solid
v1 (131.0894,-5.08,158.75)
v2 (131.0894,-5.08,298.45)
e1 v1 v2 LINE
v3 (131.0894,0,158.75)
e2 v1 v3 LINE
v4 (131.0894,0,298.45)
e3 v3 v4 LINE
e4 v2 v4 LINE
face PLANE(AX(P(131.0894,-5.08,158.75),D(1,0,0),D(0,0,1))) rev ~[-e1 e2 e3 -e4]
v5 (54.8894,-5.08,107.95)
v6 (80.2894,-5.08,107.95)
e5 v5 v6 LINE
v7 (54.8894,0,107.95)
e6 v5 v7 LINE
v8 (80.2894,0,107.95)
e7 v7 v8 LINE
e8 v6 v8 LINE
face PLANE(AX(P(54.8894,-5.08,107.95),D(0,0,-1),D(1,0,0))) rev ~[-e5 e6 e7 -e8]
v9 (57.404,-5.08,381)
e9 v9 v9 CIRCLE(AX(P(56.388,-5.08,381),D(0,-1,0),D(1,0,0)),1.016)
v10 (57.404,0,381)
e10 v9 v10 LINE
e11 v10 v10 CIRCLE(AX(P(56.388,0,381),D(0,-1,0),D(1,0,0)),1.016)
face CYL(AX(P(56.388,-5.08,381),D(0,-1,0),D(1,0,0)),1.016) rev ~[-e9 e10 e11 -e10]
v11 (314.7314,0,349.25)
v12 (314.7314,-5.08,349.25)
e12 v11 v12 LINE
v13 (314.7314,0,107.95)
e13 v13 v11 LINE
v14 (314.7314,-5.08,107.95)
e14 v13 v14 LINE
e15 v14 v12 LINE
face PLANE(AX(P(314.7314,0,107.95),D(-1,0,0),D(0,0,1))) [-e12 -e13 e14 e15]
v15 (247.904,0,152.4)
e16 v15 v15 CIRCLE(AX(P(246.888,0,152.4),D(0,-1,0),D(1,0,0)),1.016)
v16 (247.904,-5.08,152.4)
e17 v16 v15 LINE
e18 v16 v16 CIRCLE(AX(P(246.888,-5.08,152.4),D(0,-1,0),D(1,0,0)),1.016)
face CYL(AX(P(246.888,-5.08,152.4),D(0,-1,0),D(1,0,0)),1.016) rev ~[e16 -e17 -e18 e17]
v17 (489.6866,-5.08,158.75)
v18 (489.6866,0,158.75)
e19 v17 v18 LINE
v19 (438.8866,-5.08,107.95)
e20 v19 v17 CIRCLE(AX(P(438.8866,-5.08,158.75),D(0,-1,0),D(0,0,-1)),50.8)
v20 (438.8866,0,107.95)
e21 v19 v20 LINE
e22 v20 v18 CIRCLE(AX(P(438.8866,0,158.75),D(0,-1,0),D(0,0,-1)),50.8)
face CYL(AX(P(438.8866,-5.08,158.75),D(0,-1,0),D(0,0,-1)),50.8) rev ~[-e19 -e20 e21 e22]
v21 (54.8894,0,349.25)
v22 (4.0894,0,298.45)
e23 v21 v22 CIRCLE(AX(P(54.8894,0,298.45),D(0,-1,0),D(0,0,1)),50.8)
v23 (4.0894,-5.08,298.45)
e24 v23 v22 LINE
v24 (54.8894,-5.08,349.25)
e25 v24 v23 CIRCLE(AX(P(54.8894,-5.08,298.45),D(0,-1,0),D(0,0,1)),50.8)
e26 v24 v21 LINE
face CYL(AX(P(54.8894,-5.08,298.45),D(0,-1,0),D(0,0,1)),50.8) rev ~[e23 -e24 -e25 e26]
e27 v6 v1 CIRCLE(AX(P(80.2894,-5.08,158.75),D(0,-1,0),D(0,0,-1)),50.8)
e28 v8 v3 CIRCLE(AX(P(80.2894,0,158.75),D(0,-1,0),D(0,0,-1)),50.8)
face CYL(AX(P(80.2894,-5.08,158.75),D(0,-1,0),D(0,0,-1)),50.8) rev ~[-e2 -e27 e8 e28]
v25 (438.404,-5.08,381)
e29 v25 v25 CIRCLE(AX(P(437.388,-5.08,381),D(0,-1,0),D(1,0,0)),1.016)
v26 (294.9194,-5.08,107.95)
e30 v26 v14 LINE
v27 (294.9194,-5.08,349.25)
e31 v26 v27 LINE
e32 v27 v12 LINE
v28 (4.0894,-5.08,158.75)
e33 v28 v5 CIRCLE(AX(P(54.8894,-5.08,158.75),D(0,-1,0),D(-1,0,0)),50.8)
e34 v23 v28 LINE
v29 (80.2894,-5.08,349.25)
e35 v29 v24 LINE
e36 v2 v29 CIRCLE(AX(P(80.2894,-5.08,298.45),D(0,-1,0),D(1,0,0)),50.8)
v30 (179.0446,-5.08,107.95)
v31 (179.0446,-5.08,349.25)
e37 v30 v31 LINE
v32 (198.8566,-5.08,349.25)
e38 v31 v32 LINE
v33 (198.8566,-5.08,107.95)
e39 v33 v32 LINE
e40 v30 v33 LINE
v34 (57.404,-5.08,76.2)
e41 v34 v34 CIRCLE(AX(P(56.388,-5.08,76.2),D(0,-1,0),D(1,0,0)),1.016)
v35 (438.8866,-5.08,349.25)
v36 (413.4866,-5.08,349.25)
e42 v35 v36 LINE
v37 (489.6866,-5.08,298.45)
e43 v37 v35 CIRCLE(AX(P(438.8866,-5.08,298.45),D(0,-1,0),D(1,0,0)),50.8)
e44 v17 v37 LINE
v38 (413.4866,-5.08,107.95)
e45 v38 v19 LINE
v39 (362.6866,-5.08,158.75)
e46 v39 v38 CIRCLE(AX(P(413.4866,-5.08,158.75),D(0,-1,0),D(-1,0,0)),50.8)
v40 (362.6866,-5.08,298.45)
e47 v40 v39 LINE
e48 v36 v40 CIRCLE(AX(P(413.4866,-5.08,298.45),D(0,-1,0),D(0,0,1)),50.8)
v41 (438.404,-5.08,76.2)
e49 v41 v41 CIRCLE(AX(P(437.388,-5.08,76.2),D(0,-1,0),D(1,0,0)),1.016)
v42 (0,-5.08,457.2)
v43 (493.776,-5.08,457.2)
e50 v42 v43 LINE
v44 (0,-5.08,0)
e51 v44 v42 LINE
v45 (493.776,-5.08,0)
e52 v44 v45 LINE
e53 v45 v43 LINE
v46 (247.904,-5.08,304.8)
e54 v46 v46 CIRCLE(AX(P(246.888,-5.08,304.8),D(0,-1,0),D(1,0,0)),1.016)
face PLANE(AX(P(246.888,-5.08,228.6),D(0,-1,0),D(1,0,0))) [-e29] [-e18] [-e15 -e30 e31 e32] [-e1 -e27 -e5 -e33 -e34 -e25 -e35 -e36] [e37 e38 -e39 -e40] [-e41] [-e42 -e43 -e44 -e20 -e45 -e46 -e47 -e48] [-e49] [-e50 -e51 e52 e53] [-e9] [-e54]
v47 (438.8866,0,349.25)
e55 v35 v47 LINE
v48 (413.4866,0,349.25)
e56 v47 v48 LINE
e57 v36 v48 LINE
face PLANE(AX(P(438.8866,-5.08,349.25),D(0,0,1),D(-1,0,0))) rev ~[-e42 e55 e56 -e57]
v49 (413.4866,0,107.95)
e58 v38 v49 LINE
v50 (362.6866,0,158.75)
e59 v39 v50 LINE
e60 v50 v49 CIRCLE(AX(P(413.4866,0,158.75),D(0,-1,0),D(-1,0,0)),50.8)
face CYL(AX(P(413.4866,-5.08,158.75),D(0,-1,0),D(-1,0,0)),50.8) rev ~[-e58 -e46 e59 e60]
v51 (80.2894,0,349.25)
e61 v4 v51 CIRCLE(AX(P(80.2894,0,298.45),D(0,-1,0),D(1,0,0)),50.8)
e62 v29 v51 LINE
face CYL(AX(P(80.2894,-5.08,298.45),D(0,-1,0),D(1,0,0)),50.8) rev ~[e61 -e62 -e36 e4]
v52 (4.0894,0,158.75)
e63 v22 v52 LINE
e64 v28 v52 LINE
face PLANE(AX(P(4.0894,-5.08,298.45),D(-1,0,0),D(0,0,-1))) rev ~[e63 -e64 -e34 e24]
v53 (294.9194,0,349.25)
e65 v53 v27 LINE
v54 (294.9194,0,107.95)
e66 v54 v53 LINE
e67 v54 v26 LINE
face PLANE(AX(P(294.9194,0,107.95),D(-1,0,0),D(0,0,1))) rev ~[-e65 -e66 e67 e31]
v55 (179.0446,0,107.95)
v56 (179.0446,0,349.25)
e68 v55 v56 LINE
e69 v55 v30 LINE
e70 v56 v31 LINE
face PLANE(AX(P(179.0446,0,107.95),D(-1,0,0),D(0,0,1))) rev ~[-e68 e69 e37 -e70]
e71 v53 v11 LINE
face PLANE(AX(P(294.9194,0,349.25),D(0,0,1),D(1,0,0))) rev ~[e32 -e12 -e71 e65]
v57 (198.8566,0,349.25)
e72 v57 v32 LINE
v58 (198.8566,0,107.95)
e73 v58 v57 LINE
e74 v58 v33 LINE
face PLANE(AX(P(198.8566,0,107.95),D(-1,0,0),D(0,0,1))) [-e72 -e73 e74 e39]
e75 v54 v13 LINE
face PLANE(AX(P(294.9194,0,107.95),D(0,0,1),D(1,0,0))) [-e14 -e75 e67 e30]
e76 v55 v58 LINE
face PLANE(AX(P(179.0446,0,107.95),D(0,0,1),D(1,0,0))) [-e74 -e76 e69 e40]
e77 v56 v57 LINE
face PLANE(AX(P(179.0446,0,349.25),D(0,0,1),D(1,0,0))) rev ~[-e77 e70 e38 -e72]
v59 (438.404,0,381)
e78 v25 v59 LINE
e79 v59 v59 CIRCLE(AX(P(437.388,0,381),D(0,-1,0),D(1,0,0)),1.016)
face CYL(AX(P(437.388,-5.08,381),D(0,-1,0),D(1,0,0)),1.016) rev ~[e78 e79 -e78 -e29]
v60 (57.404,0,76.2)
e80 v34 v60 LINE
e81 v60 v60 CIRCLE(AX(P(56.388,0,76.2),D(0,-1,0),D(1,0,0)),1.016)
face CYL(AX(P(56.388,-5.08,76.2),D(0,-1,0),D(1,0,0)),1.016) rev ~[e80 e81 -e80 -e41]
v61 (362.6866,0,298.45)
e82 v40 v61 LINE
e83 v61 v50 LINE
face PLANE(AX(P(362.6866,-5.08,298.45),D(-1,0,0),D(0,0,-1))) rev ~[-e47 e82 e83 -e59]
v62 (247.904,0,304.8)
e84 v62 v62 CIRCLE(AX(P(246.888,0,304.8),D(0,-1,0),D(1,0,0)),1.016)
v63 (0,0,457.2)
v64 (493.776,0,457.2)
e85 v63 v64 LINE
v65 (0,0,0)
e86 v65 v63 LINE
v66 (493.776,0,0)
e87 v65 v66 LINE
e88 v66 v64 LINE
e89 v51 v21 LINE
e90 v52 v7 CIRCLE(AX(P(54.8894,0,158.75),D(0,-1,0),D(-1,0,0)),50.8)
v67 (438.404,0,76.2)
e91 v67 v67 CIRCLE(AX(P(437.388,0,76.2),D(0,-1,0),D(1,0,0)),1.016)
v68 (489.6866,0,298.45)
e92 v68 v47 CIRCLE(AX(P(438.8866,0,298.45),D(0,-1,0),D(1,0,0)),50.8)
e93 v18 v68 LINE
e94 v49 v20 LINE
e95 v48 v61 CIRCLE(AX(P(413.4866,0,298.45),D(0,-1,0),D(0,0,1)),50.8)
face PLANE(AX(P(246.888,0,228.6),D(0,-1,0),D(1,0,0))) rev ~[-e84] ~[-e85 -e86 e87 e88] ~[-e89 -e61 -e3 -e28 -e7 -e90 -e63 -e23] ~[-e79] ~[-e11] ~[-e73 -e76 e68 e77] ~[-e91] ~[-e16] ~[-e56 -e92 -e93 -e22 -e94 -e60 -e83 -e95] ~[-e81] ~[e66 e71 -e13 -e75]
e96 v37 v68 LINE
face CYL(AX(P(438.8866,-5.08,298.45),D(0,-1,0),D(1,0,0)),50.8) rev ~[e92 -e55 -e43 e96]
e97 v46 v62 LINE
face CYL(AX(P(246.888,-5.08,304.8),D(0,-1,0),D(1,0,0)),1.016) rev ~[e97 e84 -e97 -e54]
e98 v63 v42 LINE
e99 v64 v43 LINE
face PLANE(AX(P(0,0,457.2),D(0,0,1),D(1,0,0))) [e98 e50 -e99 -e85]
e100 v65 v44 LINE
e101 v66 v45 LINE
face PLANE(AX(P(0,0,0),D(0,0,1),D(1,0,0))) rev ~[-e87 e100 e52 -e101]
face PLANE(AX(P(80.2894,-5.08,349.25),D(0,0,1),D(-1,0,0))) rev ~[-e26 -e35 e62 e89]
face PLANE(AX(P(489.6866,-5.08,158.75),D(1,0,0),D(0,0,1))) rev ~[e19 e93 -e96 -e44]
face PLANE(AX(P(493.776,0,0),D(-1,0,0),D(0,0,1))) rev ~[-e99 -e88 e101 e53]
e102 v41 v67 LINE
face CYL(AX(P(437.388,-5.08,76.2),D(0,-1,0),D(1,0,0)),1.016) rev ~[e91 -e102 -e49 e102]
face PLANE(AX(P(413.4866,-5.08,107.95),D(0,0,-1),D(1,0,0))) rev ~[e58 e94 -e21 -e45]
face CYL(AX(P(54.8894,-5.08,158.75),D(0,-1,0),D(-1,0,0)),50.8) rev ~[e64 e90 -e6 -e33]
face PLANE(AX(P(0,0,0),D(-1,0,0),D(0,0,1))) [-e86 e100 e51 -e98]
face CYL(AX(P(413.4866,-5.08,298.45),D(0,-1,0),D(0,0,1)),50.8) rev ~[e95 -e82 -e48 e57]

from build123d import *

# Parameters (mm, degrees)
F0_W     = 493.776
F0_H     = 457.2
F0_W_2   = 19.812
F0_H_2   = 241.3
F1_DEPTH = 5.08
F2_R     = 1.016
F3_DEPTH = 5.081
F5_DEPTH = 5.081
F6_DEPTH = 5.08


# Not quite as in the source:
# - a feature names something its author has since deleted; it is built from what else it names


with BuildPart() as f1:
    # F0 (on Front) → F1 (new body)
    with BuildSketch(Plane.XZ):
        with Locations((246.888, 228.6)):
            Rectangle(F0_W, F0_H)
        with Locations((188.9506, 228.6)):
            Rectangle(F0_W_2, F0_H_2, mode=Mode.SUBTRACT)
        with Locations((304.8254, 228.6)):
            Rectangle(F0_W_2, F0_H_2, mode=Mode.SUBTRACT)
    extrude(amount=F1_DEPTH)

    # F2 (on face) → F3 (cut, through all)
    with BuildSketch(Plane.XZ.offset(5.08)):
        with Locations((56.388, 381)):
            Circle(F2_R)
        with Locations((56.388, 76.2)):
            Circle(F2_R)
        with Locations((437.388, 76.2)):
            Circle(F2_R)
        with Locations((437.388, 381)):
            Circle(F2_R)
    extrude(amount=-F3_DEPTH, mode=Mode.SUBTRACT)

    # F4 (on face) → F5 (cut, through all)
    with BuildSketch(Plane.XZ.offset(5.08)):
        with BuildLine():
            Line((80.2894, 349.25), (54.8894, 349.25))
            ThreePointArc((54.8894, 349.25), (18.9683755157, 334.3710244843), (4.0894, 298.45))
            Line((4.0894, 298.45), (4.0894, 158.75))
            ThreePointArc((4.0894, 158.75), (18.9683755157, 122.8289755157), (54.8894, 107.95))
            Line((54.8894, 107.95), (80.2894, 107.95))
            ThreePointArc((80.2894, 107.95), (116.2104244843, 122.8289755157), (131.0894, 158.75))
            Line((131.0894, 158.75), (131.0894, 298.45))
            ThreePointArc((131.0894, 298.45), (116.2104244843, 334.3710244843), (80.2894, 349.25))
        make_face()
        with BuildLine():
            Line((438.8866, 349.25), (413.4866, 349.25))
            ThreePointArc((413.4866, 349.25), (377.5655755157, 334.3710244843), (362.6866, 298.45))
            Line((362.6866, 298.45), (362.6866, 158.75))
            ThreePointArc((362.6866, 158.75), (377.5655755157, 122.8289755157), (413.4866, 107.95))
            Line((413.4866, 107.95), (438.8866, 107.95))
            ThreePointArc((438.8866, 107.95), (474.8076244843, 122.8289755157), (489.6866, 158.75))
            Line((489.6866, 158.75), (489.6866, 298.45))
            ThreePointArc((489.6866, 298.45), (474.8076244843, 334.3710244843), (438.8866, 349.25))
        make_face()
    extrude(amount=-F5_DEPTH, mode=Mode.SUBTRACT)

    # F2 (on face) → F6 (cut, through all)
    with BuildSketch(Plane.XZ.offset(5.08)):
        with Locations((246.888, 304.8)):
            Circle(F2_R)
        with Locations((246.888, 152.4)):
            Circle(F2_R)
    extrude(amount=-F6_DEPTH, mode=Mode.SUBTRACT)


solid = f1.part
